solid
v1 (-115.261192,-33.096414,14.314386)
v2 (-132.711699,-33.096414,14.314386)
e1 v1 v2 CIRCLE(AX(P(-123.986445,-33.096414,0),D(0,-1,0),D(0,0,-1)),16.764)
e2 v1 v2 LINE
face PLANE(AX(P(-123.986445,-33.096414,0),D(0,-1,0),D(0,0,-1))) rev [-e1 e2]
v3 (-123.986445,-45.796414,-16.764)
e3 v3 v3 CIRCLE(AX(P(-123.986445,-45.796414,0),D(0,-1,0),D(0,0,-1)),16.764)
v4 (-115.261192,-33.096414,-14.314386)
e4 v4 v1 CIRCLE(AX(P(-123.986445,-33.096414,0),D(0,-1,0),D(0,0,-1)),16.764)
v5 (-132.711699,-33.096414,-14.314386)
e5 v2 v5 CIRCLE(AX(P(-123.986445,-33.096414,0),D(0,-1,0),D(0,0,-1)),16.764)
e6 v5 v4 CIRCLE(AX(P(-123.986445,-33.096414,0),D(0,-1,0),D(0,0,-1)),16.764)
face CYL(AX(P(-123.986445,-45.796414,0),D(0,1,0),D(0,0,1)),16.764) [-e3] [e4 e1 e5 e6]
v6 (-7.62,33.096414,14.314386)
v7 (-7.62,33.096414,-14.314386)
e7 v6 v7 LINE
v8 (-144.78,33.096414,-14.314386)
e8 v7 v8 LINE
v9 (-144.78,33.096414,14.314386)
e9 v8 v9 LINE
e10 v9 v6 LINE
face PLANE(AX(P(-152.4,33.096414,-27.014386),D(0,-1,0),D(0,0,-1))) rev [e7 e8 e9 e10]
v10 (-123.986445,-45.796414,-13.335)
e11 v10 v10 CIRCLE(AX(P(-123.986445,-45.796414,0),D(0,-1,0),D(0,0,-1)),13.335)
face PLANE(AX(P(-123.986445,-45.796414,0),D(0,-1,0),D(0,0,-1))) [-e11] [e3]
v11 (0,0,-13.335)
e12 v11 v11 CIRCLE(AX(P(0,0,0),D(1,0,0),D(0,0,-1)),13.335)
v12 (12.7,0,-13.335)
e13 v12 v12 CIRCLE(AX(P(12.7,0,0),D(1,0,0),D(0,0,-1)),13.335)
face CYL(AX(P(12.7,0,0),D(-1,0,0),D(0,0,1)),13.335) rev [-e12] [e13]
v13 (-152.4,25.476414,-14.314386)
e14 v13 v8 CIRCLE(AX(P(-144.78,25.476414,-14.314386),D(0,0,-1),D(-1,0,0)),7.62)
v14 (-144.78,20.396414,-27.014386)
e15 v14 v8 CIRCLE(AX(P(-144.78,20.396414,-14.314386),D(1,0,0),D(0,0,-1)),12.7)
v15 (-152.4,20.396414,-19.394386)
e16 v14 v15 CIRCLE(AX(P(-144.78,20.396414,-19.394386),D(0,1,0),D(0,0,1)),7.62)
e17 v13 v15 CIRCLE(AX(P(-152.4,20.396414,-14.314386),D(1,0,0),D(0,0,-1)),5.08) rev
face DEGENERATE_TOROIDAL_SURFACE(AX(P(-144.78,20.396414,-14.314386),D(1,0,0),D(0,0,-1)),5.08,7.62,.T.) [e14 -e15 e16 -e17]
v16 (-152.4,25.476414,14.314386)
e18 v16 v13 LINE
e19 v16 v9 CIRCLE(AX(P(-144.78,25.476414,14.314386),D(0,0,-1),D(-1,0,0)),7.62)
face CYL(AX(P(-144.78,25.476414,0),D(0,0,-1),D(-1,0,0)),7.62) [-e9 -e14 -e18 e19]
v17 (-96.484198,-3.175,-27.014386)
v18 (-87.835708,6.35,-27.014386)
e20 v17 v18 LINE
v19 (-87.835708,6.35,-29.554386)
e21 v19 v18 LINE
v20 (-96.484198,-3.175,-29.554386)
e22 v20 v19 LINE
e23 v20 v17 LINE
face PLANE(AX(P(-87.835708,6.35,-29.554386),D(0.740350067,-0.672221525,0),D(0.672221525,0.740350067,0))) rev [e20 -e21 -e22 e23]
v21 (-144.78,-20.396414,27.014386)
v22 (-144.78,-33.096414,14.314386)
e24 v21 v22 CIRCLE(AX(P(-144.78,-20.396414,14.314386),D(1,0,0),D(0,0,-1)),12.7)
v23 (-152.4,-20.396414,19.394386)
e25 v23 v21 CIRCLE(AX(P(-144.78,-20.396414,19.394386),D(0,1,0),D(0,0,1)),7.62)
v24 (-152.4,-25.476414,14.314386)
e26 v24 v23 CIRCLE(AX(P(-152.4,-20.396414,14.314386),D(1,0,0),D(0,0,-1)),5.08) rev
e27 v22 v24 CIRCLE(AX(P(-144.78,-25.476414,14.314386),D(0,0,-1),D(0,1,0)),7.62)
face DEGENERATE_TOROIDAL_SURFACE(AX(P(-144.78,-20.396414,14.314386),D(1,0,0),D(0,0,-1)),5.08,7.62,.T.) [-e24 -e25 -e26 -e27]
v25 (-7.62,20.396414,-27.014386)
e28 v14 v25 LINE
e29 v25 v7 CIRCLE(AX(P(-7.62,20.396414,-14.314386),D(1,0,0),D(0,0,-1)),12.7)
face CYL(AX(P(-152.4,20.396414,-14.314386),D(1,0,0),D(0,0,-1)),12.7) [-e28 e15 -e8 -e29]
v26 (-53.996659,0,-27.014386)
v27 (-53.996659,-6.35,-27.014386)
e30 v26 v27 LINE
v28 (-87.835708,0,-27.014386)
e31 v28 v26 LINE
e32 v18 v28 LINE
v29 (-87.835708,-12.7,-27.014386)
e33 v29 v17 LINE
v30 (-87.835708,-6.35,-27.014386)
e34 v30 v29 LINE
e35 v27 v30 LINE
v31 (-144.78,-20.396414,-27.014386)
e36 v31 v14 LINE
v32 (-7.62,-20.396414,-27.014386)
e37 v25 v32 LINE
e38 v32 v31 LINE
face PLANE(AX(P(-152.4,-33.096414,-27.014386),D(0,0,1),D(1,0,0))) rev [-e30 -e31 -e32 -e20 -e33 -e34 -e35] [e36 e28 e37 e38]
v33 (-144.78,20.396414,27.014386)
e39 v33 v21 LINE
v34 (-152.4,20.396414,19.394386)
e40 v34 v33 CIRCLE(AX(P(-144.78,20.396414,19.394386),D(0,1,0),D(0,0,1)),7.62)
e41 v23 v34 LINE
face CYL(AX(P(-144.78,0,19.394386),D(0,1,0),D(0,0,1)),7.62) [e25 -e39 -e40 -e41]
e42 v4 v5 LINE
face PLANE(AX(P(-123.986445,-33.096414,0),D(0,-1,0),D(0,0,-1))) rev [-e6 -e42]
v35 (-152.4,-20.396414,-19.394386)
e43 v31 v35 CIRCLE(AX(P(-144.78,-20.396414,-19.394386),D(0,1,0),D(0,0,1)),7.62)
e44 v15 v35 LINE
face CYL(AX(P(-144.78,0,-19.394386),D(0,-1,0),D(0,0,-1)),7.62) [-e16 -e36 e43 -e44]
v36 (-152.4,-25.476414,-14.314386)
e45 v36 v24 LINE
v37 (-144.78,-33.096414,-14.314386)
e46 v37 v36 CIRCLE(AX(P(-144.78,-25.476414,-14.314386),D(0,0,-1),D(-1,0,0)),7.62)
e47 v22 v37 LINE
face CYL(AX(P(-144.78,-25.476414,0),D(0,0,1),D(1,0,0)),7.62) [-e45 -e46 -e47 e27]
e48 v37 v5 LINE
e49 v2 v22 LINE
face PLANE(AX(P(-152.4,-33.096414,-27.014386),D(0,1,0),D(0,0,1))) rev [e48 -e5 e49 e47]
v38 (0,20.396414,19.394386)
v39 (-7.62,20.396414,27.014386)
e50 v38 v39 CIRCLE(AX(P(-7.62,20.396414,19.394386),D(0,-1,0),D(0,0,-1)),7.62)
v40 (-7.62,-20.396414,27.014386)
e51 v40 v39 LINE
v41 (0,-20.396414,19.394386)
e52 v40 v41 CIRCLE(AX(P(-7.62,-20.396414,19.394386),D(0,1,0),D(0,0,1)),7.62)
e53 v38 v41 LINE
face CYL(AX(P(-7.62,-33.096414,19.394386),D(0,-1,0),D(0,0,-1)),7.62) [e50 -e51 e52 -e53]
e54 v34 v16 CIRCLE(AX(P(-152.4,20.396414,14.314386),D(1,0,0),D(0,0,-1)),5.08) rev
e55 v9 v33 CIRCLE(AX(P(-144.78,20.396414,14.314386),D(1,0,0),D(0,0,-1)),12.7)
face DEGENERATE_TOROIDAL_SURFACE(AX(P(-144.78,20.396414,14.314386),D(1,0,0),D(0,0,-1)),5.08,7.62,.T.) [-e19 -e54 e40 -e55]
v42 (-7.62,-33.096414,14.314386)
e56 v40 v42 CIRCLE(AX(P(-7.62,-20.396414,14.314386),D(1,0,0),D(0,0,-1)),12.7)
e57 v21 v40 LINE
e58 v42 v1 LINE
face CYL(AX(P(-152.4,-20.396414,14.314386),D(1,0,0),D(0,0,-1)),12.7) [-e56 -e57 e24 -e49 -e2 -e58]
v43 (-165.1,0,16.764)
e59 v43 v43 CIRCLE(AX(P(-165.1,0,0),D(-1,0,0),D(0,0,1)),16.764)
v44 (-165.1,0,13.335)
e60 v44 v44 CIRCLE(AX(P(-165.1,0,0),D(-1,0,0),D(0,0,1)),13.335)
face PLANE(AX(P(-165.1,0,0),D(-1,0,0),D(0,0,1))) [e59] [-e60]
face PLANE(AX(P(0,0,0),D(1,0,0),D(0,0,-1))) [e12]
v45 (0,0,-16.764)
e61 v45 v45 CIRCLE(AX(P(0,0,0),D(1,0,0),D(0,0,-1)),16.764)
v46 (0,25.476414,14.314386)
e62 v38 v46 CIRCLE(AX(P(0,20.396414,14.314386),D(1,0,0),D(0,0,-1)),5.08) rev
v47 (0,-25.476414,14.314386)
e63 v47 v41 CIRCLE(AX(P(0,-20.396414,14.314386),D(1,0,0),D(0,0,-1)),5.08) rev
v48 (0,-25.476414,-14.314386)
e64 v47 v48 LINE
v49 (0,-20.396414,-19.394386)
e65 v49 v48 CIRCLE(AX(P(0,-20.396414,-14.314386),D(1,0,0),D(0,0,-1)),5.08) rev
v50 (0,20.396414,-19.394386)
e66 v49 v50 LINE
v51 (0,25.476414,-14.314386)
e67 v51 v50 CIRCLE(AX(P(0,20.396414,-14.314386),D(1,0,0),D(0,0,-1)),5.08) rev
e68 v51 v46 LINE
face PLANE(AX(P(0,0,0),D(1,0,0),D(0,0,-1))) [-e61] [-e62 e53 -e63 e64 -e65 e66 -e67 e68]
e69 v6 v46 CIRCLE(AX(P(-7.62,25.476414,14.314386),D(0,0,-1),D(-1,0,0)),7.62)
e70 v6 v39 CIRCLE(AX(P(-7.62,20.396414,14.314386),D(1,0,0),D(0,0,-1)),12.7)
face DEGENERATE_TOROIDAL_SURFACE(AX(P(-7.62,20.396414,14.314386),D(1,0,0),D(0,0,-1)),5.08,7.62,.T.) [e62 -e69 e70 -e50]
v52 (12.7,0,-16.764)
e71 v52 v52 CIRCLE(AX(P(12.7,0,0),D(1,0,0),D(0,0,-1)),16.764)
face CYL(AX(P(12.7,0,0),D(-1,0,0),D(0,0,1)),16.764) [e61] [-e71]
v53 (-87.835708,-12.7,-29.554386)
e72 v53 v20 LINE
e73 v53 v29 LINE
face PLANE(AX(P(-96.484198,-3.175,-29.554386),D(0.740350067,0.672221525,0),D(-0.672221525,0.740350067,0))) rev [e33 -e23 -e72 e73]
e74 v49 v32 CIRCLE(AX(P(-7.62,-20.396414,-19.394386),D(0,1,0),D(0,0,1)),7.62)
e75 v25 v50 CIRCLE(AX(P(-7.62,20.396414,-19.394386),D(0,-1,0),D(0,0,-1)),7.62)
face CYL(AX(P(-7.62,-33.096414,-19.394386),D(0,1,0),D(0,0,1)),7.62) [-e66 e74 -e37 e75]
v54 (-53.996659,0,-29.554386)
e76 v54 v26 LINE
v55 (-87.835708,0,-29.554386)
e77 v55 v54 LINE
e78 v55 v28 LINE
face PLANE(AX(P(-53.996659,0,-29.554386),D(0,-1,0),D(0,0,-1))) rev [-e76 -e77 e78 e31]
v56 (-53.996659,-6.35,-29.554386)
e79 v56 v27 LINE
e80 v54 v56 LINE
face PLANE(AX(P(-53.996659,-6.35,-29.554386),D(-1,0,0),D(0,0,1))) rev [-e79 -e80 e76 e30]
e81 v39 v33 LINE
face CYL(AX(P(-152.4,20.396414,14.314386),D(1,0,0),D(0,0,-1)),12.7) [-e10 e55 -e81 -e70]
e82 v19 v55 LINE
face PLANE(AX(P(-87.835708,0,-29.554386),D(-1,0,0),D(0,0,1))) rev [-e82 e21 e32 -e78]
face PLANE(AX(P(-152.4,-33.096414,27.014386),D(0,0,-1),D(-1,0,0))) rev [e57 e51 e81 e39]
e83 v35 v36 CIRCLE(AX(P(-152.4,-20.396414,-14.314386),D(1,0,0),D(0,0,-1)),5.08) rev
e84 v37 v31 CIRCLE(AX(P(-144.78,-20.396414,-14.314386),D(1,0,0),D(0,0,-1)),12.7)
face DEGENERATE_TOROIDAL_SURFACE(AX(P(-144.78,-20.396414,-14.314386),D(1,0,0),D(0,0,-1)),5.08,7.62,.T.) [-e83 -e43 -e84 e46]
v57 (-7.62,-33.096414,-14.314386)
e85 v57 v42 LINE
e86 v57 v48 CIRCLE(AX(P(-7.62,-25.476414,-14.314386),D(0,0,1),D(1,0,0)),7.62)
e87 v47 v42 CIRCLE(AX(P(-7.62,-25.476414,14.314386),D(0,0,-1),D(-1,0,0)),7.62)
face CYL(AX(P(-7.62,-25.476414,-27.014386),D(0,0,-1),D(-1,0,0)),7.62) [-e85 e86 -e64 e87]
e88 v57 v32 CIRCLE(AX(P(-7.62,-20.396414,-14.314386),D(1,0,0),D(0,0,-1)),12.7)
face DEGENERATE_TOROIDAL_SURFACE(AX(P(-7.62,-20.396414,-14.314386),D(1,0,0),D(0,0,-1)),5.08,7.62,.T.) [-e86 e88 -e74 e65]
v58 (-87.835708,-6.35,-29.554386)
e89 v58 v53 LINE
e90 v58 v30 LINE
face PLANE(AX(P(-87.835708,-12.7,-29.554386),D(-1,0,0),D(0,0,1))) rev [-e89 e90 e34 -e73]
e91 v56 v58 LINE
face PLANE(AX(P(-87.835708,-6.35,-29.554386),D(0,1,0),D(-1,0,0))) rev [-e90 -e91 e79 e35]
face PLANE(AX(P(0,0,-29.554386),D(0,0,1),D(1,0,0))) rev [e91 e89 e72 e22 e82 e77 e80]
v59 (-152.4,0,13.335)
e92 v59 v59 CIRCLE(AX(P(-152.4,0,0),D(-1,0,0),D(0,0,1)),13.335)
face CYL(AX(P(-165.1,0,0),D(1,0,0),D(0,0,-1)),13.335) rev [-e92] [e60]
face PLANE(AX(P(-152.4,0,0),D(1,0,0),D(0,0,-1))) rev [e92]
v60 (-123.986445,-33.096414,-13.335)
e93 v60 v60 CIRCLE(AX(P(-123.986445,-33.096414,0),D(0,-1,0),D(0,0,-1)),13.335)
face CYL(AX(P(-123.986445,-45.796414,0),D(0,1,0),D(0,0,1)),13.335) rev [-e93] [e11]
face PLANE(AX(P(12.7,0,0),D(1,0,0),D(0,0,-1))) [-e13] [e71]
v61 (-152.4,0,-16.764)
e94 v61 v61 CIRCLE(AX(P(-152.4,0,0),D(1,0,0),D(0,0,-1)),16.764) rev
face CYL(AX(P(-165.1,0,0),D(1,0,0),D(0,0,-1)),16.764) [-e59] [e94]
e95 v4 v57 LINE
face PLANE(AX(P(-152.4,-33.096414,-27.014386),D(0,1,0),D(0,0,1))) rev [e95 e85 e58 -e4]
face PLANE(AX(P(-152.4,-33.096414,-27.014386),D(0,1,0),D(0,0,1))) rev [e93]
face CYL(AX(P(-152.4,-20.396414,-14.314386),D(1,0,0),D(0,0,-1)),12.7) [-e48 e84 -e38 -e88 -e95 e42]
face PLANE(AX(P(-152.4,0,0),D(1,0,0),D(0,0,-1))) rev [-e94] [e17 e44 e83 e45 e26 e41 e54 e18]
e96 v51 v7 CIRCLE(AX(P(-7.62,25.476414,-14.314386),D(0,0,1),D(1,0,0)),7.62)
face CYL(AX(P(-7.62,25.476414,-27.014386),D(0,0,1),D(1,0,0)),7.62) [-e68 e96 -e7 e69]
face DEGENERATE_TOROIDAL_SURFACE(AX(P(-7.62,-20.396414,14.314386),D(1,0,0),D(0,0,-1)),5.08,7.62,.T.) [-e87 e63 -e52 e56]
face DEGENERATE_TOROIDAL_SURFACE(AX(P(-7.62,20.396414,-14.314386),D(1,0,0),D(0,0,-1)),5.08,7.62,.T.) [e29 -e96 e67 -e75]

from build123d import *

# Parameters (mm, degrees)
SKETCH1_R           = 16.764
SKETCH1_R_2         = 13.335
BOSS_EXTRUDE1_DEPTH = 12.7
SKETCH2_W           = 54.028772228
SKETCH2_H           = 66.192828526
BOSS_EXTRUDE2_DEPTH = 152.4
FILLET1_R           = 7.62
FILLET2_R           = 12.7
FILLET3_R           = 12.7
FILLET4_R           = 7.62
BOSS_EXTRUDE3_START = 12.7
SKETCH3_R           = 16.764
SKETCH3_R_2         = 13.335
BOSS_EXTRUDE3_DEPTH = 12.7
SKETCH4_R           = 16.764
SKETCH4_R_2         = 13.335
BOSS_EXTRUDE4_DEPTH = 12.7
BOSS_EXTRUDE5_DEPTH = 2.54


with BuildPart() as part:
    # Sketch1 → Boss-Extrude1 (new body)
    with BuildSketch(Plane(origin=(0, 0, 0), x_dir=(0, 0, -1), z_dir=(1, 0, 0))):
        Circle(SKETCH1_R)
        Circle(SKETCH1_R_2, mode=Mode.SUBTRACT)
    extrude(amount=BOSS_EXTRUDE1_DEPTH)

    # Sketch2 → Boss-Extrude2 (add)
    with BuildSketch(Plane.ZY):
        Rectangle(SKETCH2_W, SKETCH2_H)
    extrude(amount=BOSS_EXTRUDE2_DEPTH)

    # Fillet1
    fillet1_edges = [part.edges().sort_by_distance(p)[0] for p in [
        (0, 33.096414263, 0),
        (0, 0, -27.014386114),
        (0, -33.096414263, 0),
        (0, 0, 27.014386114),
    ]]
    fillet(fillet1_edges, radius=FILLET1_R)

    # Fillet2
    # the kernel refuses this fillet: 12.7 mm, written as the material it takes off along each edge
    with BuildSketch(Plane(origin=(0, -20.396414263, -14.314386114), x_dir=(0, -1, 0), z_dir=(0, 0, 1))) as fillet2_piece_1:
        with BuildLine():
            CenterArc((5.08, -7.62), 7.62, 0, 90)
            Line((12.7, -7.62), (12.7, 0))
            Line((12.7, 0), (5.08, 0))
        make_face()
    revolve(axis=Axis((0, -20.396414263, -14.314386114), (1, 0, 0)), revolution_arc=90, mode=Mode.SUBTRACT)
    with BuildSketch(Plane(origin=(0, 20.396414263, -14.314386114), x_dir=(0, 0, -1), z_dir=(0, -1, 0))) as fillet2_piece_2:
        with BuildLine():
            CenterArc((5.08, -7.62), 7.62, 0, 90)
            Line((12.7, -7.62), (12.7, 0))
            Line((12.7, 0), (5.08, 0))
        make_face()
    revolve(axis=Axis((0, 20.396414263, -14.314386114), (1, 0, 0)), revolution_arc=90, mode=Mode.SUBTRACT)
    with BuildSketch(Plane(origin=(0, 20.396414263, 14.314386114), x_dir=(0, 1, 0), z_dir=(0, 0, -1))) as fillet2_piece_3:
        with BuildLine():
            CenterArc((5.08, -7.62), 7.62, 0, 90)
            Line((12.7, -7.62), (12.7, 0))
            Line((12.7, 0), (5.08, 0))
        make_face()
    revolve(axis=Axis((0, 20.396414263, 14.314386114), (1, 0, 0)), revolution_arc=90, mode=Mode.SUBTRACT)
    with BuildSketch(Plane(origin=(0, 33.096414263, 27.014386114), x_dir=(0, -1, 0), z_dir=(-1, 0, 0))) as fillet2_piece_4:
        with BuildLine():
            CenterArc((FILLET2_R, -FILLET2_R), FILLET2_R, 90, 90)
            Line((0, -FILLET2_R), (0, 0))
            Line((0, 0), (FILLET2_R, 0))
        make_face()
    extrude(amount=184.15, mode=Mode.SUBTRACT)
    with BuildSketch(Plane(origin=(0, 33.096414263, -27.014386114), x_dir=(0, -1, 0), z_dir=(-1, 0, 0)), Plane(origin=(0, -33.096414263, -27.014386114), x_dir=(0, 0, 1), z_dir=(-1, 0, 0))) as fillet2_piece_5:
        with BuildLine():
            CenterArc((FILLET2_R, FILLET2_R), FILLET2_R, 180, 90)
            Line((0, FILLET2_R), (0, 0))
            Line((0, 0), (FILLET2_R, 0))
        make_face()
    extrude(amount=184.15, mode=Mode.SUBTRACT)

    # Fillet3
    # the kernel refuses this fillet: 12.7 mm, written as the material it takes off along each edge
    with BuildSketch(Plane(origin=(0, -20.396414263, 14.314386114), x_dir=(0, 0, 1), z_dir=(0, 1, 0))) as fillet3_piece_1:
        with BuildLine():
            CenterArc((5.08, -7.62), 7.62, 0, 90)
            Line((12.7, -7.62), (12.7, 0))
            Line((12.7, 0), (5.08, 0))
        make_face()
    revolve(axis=Axis((0, -20.396414263, 14.314386114), (1, 0, 0)), revolution_arc=90, mode=Mode.SUBTRACT)
    with BuildSketch(Plane(origin=(0, -33.096414263, 27.014386114), x_dir=(0, 0, -1), z_dir=(-1, 0, 0))) as fillet3_piece_2:
        with BuildLine():
            CenterArc((FILLET3_R, -FILLET3_R), FILLET3_R, 90, 90)
            Line((0, -FILLET3_R), (0, 0))
            Line((0, 0), (FILLET3_R, 0))
        make_face()
    extrude(amount=184.15, mode=Mode.SUBTRACT)

    # Fillet4
    fillet4_edges = [part.edges().sort_by_distance(p)[0] for p in [
        (-152.4, -33.096414263, 0),
        (-152.4, 0, -27.014386114),
        (-152.4, 33.096414263, 0),
        (-152.4, 29.376670384, -23.294642235),
        (-152.4, 29.376670384, 23.294642235),
        (-152.4, -29.376670384, -23.294642235),
        (-152.4, 0, 27.014386114),
        (-152.4, -29.376670384, 23.294642235),
    ]]
    fillet(fillet4_edges, radius=FILLET4_R)

    # Sketch3 → Boss-Extrude3 (add)
    with BuildSketch(Plane.ZY.offset(152.4).offset(BOSS_EXTRUDE3_START)):
        with Locations(Location((0, 0, 0), (0, 0, 180))):
            Circle(SKETCH3_R)
        with Locations(Location((0, 0, 0), (0, 0, 180))):
            Circle(SKETCH3_R_2, mode=Mode.SUBTRACT)
    extrude(amount=-BOSS_EXTRUDE3_DEPTH)

    # Sketch4 → Boss-Extrude4 (add)
    with BuildSketch(Plane.XZ.offset(33.096414263)):
        with Locations(Location((-123.986445469, 0, 0), (0, 0, 58.635839184))):
            Circle(SKETCH4_R)
        with Locations(Location((-123.986445469, 0, 0), (0, 0, 270))):
            Circle(SKETCH4_R_2, mode=Mode.SUBTRACT)
    extrude(amount=BOSS_EXTRUDE4_DEPTH)

    # Sketch5 → Boss-Extrude5 (add)
    with BuildSketch(Plane(origin=(0, 0, -27.014386114), x_dir=(-1, 0, 0), z_dir=(0, 0, -1))):
        Polygon((53.996659103, 0), (87.835708054, 0), (87.835708054, 6.35), (96.484197887, -3.175), (87.835708054, -12.7), (87.835708054, -6.35), (53.996659103, -6.35), align=None)
    extrude(amount=BOSS_EXTRUDE5_DEPTH)


solid = part.part
